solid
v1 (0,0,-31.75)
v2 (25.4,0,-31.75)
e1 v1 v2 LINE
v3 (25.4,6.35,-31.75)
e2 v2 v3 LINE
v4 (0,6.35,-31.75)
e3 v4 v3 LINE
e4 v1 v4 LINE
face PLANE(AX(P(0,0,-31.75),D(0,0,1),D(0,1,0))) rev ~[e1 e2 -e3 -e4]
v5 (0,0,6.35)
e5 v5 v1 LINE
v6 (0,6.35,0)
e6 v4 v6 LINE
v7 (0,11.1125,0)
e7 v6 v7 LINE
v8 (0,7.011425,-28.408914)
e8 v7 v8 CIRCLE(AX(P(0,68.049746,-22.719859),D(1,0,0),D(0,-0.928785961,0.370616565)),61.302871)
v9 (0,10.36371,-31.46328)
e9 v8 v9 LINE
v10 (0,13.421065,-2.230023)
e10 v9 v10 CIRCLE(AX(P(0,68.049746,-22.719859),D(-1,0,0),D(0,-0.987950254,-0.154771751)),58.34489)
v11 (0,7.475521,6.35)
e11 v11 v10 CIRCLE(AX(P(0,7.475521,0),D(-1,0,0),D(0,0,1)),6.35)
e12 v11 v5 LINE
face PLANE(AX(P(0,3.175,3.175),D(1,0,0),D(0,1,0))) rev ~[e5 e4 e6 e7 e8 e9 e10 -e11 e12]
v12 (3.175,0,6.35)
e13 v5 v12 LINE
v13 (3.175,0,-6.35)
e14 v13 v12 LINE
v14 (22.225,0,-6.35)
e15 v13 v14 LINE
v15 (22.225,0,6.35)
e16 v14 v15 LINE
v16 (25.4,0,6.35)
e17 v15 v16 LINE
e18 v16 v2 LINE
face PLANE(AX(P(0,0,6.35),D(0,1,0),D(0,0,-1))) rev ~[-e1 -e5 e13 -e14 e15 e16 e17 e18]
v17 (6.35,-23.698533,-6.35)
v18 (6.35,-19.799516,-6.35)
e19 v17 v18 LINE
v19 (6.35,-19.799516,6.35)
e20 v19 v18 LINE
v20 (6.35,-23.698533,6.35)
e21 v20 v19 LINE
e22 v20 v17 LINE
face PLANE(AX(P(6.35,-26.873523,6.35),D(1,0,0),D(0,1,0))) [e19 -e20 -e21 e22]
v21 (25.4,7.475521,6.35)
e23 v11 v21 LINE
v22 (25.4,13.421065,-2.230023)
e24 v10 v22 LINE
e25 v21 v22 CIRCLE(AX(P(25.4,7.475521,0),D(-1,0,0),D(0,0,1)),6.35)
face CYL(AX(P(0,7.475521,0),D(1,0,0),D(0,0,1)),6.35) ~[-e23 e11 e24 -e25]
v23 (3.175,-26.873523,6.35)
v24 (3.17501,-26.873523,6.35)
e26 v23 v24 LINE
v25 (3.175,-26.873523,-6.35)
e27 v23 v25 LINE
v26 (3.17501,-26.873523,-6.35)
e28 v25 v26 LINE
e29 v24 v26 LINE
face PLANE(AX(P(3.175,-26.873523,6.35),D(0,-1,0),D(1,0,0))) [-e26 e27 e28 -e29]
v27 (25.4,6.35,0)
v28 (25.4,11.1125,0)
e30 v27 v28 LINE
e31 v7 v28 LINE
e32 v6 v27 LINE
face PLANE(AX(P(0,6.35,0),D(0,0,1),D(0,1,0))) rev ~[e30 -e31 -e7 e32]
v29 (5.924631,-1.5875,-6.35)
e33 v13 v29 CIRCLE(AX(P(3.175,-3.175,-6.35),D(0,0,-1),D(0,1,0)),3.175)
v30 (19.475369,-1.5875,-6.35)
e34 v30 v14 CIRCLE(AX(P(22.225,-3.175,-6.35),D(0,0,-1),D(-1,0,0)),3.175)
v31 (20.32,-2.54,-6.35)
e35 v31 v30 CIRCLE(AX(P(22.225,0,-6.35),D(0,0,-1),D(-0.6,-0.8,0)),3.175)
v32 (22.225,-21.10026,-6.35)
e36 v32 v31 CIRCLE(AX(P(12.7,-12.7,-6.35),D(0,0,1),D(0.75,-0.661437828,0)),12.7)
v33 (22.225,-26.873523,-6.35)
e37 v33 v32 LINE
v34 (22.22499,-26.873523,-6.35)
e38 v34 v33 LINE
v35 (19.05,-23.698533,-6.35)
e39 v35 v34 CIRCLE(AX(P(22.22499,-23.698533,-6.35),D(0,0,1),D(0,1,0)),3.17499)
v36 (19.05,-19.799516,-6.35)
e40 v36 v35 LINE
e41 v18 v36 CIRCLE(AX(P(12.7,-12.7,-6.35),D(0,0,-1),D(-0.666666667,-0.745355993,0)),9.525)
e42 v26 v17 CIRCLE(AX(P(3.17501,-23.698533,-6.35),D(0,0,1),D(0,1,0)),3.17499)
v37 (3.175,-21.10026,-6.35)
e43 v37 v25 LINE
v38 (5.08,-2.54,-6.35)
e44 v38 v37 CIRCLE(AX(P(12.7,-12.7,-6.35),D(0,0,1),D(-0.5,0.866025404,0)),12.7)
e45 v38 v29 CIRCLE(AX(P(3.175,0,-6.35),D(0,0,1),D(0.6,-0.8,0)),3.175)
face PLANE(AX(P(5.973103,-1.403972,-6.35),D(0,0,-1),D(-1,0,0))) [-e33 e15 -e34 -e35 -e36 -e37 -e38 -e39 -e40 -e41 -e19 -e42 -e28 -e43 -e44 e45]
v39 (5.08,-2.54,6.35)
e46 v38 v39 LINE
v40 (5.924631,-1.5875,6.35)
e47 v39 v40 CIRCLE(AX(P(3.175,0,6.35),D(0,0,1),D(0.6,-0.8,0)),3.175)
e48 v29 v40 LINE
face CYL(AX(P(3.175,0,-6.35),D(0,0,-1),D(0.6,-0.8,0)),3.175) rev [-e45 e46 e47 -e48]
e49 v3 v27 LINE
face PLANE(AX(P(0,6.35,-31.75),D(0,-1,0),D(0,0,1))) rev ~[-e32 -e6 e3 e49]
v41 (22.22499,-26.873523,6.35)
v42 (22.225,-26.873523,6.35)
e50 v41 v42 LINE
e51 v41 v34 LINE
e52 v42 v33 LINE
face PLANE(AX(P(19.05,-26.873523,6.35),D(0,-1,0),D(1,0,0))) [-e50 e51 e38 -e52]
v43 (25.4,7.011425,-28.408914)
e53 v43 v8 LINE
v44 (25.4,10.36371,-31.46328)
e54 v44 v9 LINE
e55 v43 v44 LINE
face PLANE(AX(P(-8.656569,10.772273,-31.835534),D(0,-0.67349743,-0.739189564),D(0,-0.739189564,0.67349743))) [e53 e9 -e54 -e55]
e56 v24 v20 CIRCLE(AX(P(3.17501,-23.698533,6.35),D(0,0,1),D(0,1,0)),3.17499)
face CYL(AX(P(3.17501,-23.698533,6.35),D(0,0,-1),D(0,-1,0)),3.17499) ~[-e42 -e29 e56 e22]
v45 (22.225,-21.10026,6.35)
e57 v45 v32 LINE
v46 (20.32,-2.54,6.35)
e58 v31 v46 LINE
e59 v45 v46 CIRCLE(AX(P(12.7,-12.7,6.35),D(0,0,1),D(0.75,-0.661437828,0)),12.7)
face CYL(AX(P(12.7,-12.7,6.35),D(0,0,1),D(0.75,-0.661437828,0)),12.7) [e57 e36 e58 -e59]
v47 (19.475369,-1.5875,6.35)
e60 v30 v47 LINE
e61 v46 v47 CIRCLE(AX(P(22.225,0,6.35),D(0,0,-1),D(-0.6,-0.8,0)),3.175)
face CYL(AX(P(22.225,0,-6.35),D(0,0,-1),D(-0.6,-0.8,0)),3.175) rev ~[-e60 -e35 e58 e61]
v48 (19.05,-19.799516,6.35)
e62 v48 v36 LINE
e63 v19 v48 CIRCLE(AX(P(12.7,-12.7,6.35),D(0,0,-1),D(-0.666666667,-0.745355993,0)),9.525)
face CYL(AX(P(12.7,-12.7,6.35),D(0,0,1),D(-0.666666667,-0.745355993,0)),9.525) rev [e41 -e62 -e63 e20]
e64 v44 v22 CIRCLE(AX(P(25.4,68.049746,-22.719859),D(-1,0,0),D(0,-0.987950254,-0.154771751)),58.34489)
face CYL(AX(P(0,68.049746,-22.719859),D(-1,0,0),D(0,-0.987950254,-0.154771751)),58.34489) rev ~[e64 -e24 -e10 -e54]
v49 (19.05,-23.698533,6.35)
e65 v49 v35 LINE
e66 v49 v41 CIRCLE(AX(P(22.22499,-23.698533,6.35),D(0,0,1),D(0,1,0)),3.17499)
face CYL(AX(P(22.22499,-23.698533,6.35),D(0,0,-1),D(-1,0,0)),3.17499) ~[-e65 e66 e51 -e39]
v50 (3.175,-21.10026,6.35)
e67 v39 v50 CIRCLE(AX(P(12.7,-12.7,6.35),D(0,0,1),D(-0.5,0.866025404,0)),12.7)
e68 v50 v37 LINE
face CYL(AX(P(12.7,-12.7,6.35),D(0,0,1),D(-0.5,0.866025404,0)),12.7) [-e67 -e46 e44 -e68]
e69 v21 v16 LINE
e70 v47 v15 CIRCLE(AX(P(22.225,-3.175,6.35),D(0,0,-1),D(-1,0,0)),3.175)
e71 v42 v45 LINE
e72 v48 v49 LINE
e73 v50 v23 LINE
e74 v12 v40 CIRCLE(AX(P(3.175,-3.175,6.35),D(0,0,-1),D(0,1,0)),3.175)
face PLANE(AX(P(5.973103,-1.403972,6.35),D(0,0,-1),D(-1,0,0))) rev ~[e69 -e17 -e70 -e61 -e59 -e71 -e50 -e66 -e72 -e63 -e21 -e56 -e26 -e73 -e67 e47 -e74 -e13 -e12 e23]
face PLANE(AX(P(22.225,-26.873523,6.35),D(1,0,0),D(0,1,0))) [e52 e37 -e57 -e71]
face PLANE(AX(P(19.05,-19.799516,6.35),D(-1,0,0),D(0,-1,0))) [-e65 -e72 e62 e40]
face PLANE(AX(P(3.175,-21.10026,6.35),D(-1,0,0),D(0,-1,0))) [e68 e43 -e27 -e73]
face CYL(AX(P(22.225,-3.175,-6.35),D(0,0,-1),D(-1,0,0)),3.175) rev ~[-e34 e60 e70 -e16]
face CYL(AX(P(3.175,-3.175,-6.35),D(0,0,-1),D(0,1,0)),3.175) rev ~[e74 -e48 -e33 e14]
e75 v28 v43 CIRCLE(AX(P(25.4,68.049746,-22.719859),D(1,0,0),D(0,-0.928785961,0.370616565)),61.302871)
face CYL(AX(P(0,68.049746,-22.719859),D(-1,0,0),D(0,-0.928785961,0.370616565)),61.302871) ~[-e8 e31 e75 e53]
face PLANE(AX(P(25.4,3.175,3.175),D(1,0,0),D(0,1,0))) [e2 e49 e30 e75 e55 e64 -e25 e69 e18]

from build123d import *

# Parameters (mm, degrees)
F0_W        = 6.35
F0_H        = 6.35
F0_H_2      = 31.75
F1_DEPTH    = 25.4
F3_DEPTH    = 12.7
F4_R        = 3.17499
F5_T1_DEPTH = 12.7
F6_R        = 6.35
F7_T1_DEPTH = 42.7131376889


# Not quite as in the source:
# - a fillet or chamfer that OpenCascade refuses, or shapes differently, is made with other operations: its cross-section is extruded or revolved along the edge and cut away or added
# - a fillet or chamfer is up to 0.001 mm smaller than in the source, because OpenCascade refuses the exact size


with BuildPart() as f1:
    # F0 (on Right) → F1 (new body)
    with BuildSketch(Plane.YZ):
        with Locations((3.175, 3.175)):
            Rectangle(F0_W, F0_H)
        with Locations((3.175, -15.875)):
            Rectangle(F0_W, F0_H_2)
        with BuildLine():
            Line((6.35, 6.35), (6.35, 0))
            Line((6.35, 0), (11.1125, 0))
            ThreePointArc((11.1125, 0), (7.1582593776, -15.6298064568), (7.4156091525, -31.75))
            Line((7.4156091525, -31.75), (10.4078971116, -31.75))
            ThreePointArc((10.4078971116, -31.75), (10.6800087855, -12.0972684736), (17.4625, 6.35))
            Line((17.4625, 6.35), (6.35, 6.35))
        make_face()
    extrude(amount=F1_DEPTH)

    # F2 (on face) → F3 (join)
    with BuildSketch(Plane.XY.offset(6.35)):
        with BuildLine():
            Line((19.05, 0), (6.35, 0))
            Line((6.35, 0), (6.35, -1.7014773719))
            ThreePointArc((6.35, -1.7014773719), (0.166760111, -10.6486838652), (3.175, -21.1002604126))
            ThreePointArc((3.175, -21.1002604126), (4.6568881715, -22.5284460682), (6.35, -23.6985226281))
            Line((6.35, -23.6985226281), (6.35, -19.7995158286))
            ThreePointArc((6.35, -19.7995158286), (12.7, -3.175), (19.05, -19.7995158286))
            Line((19.05, -19.7995158286), (19.05, -23.6985226281))
            ThreePointArc((19.05, -23.6985226281), (20.7431118285, -22.5284460682), (22.225, -21.1002604126))
            ThreePointArc((22.225, -21.1002604126), (25.233239889, -10.6486838652), (19.05, -1.7014773719))
            Line((19.05, -1.7014773719), (19.05, 0))
        make_face()
        with BuildLine():
            ThreePointArc((6.35, -23.6985226281), (4.6568881715, -22.5284460682), (3.175, -21.1002604126))
            Line((3.175, -21.1002604126), (3.175, -26.8735226281))
            Line((3.175, -26.8735226281), (6.35, -26.8735226281))
            Line((6.35, -26.8735226281), (6.35, -23.6985226281))
        make_face()
        with BuildLine():
            Line((22.225, -26.8735226281), (22.225, -21.1002604126))
            ThreePointArc((22.225, -21.1002604126), (20.7431118285, -22.5284460682), (19.05, -23.6985226281))
            Line((19.05, -23.6985226281), (19.05, -26.8735226281))
            Line((19.05, -26.8735226281), (22.225, -26.8735226281))
        make_face()
    extrude(amount=-F3_DEPTH)

    # F4 (radius 3.175 in the source; OpenCascade refuses exactly that, so slightly less here)
    f4_edges = [f1.edges().sort_by_distance(p)[0] for p in [
        (6.35, -26.873523, 0),
        (19.05, -26.873523, 0),
    ]]
    fillet(f4_edges, radius=F4_R)

    # F5: fillet of radius 3.175 on 4 edges, made by hand

    # F5_s2 → F5_t1 (join)
    with BuildSketch(Plane.XY.offset(-6.35)):
        with BuildLine():
            ThreePointArc((5.08, -2.54), (6.0148063314, -1.4199031657), (6.35, 0))
            Line((6.35, 0), (6.35, -1.7014773719))
            ThreePointArc((6.35, -1.7014773719), (5.7024286321, -2.1016984875), (5.08, -2.54))
        make_face()
        with BuildLine():
            ThreePointArc((20.32, -2.54), (19.3851936686, -1.4199031657), (19.05, 0))
            Line((19.05, 0), (19.05, -1.7014773719))
            ThreePointArc((19.05, -1.7014773719), (19.6975713679, -2.1016984875), (20.32, -2.54))
        make_face()
        with BuildLine():
            ThreePointArc((19.05, -3.175), (19.9799359697, -0.9299359697), (22.225, 0))
            Line((22.225, 0), (19.05, 0))
            Line((19.05, 0), (19.05, -3.175))
        make_face()
        with BuildLine():
            ThreePointArc((3.175, 0), (5.4200640303, -0.9299359697), (6.35, -3.175))
            Line((6.35, -3.175), (6.35, 0))
            Line((6.35, 0), (3.175, 0))
        make_face()
    extrude(amount=F5_T1_DEPTH)

    # F6
    f6_edges = [f1.edges().sort_by_distance(p)[0] for p in [
        (12.7, 17.4625, 6.35),
    ]]
    fillet(f6_edges, radius=F6_R)

    # F7: chamfer of 3.175 on 1 edges, made by hand

    # F7_s2 → F7_t1 (cut)
    with BuildSketch(Plane.YZ.offset(-8.6565688444)):
        with BuildLine():
            Line((10.772273237, -31.8355341736), (6.9175477916, -28.3233800406))
            Line((6.9175477916, -28.3233800406), (6.8543218231, -28.3292729944))
            ThreePointArc((6.8543218231, -28.3292729944), (7.1217830499, -30.0420734544), (7.3528018544, -31.759353786))
            Line((7.3528018544, -31.759353786), (7.4156091525, -31.8135))
            ThreePointArc((7.4156091525, -31.8135), (9.0939411948, -31.8135), (10.772273237, -31.8990341736))
            Line((10.772273237, -31.8990341736), (10.772273237, -31.8355341736))
        make_face()
    extrude(amount=F7_T1_DEPTH, mode=Mode.SUBTRACT)


solid = f1.part
